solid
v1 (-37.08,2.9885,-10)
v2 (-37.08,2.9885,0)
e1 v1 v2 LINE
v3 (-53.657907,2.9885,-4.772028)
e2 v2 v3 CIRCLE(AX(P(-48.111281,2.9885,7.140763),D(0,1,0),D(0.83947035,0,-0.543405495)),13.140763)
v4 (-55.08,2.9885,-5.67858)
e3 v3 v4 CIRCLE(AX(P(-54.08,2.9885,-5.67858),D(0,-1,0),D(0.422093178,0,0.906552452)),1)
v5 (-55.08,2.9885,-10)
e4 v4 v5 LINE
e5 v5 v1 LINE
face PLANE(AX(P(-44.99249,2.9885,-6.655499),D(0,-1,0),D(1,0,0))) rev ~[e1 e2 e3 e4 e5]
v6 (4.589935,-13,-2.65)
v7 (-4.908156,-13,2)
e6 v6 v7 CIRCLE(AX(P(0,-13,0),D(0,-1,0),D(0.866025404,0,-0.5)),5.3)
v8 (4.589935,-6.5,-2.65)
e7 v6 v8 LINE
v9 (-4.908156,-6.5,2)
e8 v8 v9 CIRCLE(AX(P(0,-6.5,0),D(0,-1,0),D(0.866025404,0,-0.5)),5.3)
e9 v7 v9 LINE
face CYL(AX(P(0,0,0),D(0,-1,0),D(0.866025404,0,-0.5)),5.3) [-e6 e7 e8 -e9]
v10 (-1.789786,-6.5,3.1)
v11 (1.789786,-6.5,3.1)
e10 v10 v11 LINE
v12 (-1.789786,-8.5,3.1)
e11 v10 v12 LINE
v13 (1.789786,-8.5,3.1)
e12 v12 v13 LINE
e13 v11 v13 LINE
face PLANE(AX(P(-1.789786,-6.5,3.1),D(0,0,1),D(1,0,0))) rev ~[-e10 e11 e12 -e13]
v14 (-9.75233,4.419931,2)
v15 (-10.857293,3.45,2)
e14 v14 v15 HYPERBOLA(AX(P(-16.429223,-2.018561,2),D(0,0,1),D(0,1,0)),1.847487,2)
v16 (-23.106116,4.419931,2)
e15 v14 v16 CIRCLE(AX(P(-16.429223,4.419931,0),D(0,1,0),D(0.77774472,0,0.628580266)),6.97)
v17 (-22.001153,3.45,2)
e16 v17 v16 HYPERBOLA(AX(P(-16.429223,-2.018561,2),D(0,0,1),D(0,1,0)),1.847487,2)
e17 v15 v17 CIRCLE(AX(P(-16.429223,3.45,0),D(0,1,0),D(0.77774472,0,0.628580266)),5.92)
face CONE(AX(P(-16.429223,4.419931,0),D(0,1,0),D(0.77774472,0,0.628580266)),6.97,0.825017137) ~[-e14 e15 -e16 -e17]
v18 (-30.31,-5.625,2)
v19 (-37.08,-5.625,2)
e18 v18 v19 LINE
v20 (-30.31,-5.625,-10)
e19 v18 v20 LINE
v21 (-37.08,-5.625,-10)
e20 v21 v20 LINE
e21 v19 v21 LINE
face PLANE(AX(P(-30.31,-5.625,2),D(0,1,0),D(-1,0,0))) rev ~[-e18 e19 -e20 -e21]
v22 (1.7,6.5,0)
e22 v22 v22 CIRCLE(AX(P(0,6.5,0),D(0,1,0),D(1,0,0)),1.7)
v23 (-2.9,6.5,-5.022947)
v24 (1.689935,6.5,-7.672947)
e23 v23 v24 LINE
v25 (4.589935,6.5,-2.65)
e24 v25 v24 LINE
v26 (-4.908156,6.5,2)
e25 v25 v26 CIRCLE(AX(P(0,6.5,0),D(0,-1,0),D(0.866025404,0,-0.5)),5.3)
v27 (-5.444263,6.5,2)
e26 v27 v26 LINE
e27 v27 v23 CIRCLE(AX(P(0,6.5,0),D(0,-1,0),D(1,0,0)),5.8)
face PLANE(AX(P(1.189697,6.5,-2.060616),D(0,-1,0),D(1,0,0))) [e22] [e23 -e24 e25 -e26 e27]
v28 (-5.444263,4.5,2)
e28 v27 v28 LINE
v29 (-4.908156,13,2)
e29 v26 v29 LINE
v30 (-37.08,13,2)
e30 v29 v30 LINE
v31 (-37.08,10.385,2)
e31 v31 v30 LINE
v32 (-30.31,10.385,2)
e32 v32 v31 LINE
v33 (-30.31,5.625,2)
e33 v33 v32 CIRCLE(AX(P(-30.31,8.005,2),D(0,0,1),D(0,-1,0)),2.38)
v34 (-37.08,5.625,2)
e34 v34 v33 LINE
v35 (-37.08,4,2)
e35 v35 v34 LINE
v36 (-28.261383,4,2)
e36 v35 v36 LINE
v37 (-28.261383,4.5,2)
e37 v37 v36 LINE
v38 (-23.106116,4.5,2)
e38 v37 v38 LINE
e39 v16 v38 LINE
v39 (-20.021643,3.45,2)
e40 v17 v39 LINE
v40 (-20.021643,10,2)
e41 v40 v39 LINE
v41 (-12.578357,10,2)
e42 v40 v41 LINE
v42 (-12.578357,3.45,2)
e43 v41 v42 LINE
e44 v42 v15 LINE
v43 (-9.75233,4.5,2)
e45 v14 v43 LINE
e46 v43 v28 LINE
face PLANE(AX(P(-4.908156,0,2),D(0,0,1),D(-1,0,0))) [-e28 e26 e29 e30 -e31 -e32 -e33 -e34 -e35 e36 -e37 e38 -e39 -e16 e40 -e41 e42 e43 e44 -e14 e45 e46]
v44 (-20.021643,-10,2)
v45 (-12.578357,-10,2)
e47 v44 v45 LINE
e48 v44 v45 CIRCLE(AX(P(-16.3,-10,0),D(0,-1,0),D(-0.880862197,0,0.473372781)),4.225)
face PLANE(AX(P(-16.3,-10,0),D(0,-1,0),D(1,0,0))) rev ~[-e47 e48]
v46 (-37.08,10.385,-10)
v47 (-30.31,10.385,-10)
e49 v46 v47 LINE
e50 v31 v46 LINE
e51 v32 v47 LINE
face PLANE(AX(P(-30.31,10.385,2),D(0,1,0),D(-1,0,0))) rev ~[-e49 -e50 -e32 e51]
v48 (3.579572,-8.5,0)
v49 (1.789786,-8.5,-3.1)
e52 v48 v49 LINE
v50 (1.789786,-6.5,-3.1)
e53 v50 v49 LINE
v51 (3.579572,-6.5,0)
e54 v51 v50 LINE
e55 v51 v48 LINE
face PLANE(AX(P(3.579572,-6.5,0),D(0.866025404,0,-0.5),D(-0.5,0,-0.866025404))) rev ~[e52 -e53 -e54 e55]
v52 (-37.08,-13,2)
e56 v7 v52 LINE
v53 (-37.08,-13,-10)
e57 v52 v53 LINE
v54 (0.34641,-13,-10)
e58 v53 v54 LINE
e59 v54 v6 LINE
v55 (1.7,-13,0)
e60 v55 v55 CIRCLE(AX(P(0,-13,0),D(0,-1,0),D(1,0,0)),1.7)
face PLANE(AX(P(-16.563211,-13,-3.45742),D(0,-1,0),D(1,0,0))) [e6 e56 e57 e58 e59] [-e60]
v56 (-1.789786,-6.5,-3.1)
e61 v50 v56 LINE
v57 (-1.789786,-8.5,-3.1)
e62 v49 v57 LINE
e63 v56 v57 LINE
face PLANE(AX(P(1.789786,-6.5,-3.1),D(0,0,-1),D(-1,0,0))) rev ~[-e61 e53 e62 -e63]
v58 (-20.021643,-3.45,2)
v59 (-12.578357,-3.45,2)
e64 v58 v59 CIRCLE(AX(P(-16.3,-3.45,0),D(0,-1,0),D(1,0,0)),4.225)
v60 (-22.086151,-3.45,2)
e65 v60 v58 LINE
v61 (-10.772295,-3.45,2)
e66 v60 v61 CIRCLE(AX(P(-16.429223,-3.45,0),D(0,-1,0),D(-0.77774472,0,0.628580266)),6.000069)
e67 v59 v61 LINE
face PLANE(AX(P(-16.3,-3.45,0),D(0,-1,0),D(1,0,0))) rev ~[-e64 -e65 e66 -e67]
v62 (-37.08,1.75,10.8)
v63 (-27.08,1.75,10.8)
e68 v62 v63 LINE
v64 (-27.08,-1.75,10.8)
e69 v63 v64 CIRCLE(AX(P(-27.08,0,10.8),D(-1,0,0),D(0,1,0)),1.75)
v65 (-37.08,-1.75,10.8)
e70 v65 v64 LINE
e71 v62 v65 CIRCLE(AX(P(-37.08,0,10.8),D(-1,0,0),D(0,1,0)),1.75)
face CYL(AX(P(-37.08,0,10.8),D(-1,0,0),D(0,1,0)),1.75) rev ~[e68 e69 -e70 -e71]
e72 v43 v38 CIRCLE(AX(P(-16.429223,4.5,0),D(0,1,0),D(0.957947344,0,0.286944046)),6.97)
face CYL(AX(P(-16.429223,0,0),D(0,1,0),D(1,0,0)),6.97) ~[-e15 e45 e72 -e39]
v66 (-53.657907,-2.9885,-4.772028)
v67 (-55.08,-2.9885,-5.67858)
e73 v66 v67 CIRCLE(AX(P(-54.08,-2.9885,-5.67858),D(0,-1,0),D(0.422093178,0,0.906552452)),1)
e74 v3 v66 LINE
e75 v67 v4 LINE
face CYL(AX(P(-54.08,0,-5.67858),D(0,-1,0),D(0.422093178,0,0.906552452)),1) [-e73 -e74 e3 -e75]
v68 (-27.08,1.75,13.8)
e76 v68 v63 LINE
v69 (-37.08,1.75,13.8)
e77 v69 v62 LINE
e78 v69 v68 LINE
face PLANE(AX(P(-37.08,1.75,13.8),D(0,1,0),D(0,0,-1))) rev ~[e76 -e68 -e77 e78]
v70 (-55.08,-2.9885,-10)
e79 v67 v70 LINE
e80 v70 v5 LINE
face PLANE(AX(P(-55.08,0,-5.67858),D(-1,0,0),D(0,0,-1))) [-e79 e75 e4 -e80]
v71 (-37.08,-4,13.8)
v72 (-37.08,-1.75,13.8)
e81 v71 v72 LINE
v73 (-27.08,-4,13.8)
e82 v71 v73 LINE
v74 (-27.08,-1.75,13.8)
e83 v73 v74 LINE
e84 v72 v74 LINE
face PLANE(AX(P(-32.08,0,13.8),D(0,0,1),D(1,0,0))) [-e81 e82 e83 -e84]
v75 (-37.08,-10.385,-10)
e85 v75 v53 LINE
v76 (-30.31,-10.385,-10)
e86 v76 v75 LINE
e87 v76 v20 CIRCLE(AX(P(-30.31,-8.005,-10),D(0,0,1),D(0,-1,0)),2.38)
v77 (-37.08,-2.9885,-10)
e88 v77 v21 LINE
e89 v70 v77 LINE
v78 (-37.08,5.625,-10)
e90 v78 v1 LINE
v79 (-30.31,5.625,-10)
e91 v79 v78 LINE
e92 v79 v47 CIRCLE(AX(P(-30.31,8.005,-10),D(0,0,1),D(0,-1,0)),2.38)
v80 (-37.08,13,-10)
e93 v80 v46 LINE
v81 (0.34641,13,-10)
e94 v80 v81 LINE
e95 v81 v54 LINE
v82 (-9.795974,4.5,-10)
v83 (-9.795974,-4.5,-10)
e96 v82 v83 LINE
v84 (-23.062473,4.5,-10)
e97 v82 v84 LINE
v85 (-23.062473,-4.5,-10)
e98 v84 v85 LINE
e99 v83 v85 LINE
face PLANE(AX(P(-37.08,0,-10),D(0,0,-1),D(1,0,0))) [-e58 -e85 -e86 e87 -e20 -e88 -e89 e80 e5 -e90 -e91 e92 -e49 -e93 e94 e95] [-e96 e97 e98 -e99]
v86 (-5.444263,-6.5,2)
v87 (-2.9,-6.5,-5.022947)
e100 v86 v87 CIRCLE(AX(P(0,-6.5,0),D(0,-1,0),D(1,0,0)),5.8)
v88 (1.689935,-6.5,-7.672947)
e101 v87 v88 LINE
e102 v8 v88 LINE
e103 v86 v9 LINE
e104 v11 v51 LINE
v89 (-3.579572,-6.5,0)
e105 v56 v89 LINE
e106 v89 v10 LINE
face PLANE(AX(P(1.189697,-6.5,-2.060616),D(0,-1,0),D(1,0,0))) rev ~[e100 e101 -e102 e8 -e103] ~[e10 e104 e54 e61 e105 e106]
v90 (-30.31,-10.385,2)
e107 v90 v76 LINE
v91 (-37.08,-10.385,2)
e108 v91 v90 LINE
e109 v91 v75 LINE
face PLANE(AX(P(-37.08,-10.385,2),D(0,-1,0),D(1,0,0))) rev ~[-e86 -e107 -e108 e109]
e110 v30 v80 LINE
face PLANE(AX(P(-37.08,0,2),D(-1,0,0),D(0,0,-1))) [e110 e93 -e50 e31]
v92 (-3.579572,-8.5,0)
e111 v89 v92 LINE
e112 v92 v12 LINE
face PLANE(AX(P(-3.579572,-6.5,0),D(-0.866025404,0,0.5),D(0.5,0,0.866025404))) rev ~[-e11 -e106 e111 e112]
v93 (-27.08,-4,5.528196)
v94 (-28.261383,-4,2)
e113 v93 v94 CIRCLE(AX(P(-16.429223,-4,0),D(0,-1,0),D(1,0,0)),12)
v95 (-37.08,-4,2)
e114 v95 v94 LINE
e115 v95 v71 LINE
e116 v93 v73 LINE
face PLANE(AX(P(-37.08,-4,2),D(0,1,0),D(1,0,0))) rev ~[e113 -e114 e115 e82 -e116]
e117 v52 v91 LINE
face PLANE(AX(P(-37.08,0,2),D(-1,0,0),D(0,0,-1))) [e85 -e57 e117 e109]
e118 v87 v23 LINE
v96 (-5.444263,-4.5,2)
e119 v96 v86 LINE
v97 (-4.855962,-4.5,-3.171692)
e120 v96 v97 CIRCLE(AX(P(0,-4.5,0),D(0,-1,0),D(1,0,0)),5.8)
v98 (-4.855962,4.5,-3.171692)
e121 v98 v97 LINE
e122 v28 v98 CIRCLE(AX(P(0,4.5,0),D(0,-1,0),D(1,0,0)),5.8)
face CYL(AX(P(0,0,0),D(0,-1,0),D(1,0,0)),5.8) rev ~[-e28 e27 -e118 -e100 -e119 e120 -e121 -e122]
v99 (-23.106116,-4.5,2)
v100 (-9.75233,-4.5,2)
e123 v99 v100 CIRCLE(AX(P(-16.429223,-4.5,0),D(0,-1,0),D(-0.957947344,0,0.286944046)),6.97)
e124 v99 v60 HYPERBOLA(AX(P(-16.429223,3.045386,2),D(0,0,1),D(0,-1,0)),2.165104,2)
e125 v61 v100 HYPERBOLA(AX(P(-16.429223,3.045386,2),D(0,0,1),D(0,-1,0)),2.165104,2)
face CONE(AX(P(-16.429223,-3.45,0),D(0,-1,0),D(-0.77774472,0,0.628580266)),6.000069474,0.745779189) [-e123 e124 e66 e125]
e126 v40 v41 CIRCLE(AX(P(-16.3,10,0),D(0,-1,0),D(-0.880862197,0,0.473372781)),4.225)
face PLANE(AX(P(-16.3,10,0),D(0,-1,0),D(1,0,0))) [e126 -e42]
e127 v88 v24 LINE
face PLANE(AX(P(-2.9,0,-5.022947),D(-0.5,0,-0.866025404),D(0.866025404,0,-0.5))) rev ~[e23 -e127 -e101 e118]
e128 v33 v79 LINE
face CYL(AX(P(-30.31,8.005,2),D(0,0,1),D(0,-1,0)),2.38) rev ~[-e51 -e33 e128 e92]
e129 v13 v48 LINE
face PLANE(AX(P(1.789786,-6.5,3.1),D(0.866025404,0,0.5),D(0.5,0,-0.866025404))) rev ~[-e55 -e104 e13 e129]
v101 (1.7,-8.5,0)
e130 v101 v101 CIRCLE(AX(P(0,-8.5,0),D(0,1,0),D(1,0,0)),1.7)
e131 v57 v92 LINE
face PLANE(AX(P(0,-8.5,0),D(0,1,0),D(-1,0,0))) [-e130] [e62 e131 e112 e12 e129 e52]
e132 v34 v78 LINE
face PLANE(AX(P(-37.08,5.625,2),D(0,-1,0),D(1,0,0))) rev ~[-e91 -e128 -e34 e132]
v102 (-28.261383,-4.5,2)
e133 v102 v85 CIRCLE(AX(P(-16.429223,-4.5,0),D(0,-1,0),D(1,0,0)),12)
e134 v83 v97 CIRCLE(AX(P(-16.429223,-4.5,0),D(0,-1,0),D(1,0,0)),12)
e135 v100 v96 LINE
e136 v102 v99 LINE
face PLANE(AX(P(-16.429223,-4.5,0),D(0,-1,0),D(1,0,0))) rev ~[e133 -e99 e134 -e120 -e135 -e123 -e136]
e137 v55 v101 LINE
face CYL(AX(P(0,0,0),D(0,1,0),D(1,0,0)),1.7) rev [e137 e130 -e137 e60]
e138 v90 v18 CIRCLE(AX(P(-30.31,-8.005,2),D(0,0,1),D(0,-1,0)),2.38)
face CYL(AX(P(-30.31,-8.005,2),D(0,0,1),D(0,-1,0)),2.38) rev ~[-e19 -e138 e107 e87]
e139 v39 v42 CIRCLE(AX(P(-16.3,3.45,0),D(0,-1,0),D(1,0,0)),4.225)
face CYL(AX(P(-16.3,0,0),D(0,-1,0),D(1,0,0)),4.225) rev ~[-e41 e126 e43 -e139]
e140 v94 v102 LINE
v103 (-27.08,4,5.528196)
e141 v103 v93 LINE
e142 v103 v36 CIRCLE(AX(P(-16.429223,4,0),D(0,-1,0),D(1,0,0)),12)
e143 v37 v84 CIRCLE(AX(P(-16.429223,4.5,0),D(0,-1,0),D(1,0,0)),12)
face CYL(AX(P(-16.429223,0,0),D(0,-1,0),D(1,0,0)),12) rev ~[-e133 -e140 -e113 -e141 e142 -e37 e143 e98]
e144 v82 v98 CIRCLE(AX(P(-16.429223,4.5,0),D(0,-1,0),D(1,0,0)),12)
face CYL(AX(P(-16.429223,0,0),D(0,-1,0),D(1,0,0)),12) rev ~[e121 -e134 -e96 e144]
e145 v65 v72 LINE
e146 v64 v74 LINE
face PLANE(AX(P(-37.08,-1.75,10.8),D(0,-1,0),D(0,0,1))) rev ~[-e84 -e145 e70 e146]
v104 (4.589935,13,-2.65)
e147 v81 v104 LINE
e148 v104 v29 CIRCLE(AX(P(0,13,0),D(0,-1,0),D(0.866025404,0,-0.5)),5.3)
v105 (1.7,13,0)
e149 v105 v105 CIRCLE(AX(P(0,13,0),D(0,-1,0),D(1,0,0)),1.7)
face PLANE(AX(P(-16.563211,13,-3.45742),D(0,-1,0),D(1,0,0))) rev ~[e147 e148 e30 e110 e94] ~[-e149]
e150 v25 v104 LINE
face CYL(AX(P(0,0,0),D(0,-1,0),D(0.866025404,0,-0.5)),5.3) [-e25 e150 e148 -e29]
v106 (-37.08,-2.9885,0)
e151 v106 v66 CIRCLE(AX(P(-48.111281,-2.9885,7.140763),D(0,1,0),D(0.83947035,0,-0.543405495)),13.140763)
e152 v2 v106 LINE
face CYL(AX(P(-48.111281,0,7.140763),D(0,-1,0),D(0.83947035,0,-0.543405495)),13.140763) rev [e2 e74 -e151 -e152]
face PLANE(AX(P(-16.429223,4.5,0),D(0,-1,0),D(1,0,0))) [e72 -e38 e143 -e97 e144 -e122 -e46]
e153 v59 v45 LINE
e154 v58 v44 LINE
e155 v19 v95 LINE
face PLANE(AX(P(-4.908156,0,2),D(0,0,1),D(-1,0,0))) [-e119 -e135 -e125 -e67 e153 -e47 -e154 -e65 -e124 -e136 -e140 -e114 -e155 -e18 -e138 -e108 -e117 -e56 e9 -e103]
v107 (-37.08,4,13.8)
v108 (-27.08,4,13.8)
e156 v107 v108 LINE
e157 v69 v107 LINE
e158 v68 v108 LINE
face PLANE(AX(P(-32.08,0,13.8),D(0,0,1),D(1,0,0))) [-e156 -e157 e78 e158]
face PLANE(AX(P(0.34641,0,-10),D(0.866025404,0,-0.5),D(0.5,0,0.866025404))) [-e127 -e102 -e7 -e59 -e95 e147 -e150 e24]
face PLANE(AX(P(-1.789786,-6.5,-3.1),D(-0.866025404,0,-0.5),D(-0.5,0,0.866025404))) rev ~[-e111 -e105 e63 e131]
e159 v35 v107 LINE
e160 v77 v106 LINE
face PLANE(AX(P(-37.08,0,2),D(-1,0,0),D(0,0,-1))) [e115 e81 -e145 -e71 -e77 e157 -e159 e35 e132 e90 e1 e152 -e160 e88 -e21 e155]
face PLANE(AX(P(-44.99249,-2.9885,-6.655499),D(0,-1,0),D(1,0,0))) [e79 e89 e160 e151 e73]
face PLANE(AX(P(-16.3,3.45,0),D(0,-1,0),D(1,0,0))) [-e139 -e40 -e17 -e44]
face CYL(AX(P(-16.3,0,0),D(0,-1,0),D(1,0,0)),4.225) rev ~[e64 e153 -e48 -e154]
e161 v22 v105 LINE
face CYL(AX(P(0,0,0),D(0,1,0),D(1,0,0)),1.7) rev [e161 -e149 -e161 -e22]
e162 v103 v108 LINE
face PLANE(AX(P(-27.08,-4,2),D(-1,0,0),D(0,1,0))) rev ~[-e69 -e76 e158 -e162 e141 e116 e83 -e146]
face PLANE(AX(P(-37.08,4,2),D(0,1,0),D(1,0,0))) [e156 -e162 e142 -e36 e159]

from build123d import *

# Parameters (mm, degrees)
F0_R         = 1.7
F1_DEPTH     = 13
F3_DEPTH     = 12.001
F5_DEPTH     = 6.5
F6_W         = 10
F6_H         = 8
F7_DEPTH     = 11.8
F9_DEPTH     = 42.381
F10_R        = 4.225
F11_DEPTH    = 10
F12_R        = 7.5
F13_DEPTH    = 3.45
F16_R        = 12
F16_R_2      = 6.97
F17_DEPTH    = 4.5
F18_T4_ANGLE = 257.8909092885
F18_T7_ANGLE = 257.8909092885
F20_DEPTH    = 2.9885
F22_DEPTH    = 2


# Not quite as in the source:
# - a fillet or chamfer that OpenCascade refuses, or shapes differently, is made with other operations: its cross-section is extruded or revolved along the edge and cut away or added


with BuildPart() as f1:
    # F0 (on Front) → F1 (new body, symmetric)
    with BuildSketch(Plane.XZ):
        with BuildLine():
            Line((-37.08, 2), (-37.08, -10))
            Line((-37.08, -10), (0.3464101615, -10))
            Line((0.3464101615, -10), (4.5899346401, -2.65))
            ThreePointArc((4.5899346401, -2.65), (2.3304380027, 4.760153224), (-4.9081564767, 2))
            Line((-4.9081564767, 2), (-37.08, 2))
        make_face()
        Circle(F0_R, mode=Mode.SUBTRACT)
    extrude(amount=F1_DEPTH, both=True)

    # F2 (on face) → F3 (cut, through all)
    with BuildSketch(Plane.XY.offset(2)):
        with BuildLine():
            Line((-30.31, 10.385), (-37.08, 10.385))
            Line((-37.08, 10.385), (-37.08, 5.625))
            Line((-37.08, 5.625), (-30.31, 5.625))
            ThreePointArc((-30.31, 5.625), (-27.93, 8.005), (-30.31, 10.385))
        make_face()
        with BuildLine():
            ThreePointArc((-30.31, -10.385), (-27.93, -8.005), (-30.31, -5.625))
            Line((-30.31, -5.625), (-37.08, -5.625))
            Line((-37.08, -5.625), (-37.08, -10.385))
            Line((-37.08, -10.385), (-30.31, -10.385))
        make_face()
    extrude(amount=-F3_DEPTH, mode=Mode.SUBTRACT)

    # F4 (on Front) → F5 (cut, symmetric)
    with BuildSketch(Plane.XZ):
        with BuildLine():
            Line((5.8, -10.0458946839), (5.8, 0))
            ThreePointArc((5.8, 0), (-2.9, 5.0229473419), (-2.9, -5.0229473419))
            Line((-2.9, -5.0229473419), (5.8, -10.0458946839))
        make_face()
    extrude(amount=F5_DEPTH, both=True, mode=Mode.SUBTRACT)

    # F6 (on face) → F7 (join)
    with BuildSketch(Plane.XY.offset(2)):
        with Locations((-32.08, 0)):
            Rectangle(F6_W, F6_H)
    extrude(amount=F7_DEPTH)

    # F8 (on face) → F9 (cut, through all)
    with BuildSketch(Plane(origin=(-37.08, 0, 0), x_dir=(0, -1, 0), z_dir=(-1, 0, 0))):
        with BuildLine():
            Line((1.75, 13.8), (-1.75, 13.8))
            Line((-1.75, 13.8), (-1.75, 10.8))
            ThreePointArc((-1.75, 10.8), (0, 9.05), (1.75, 10.8))
            Line((1.75, 10.8), (1.75, 13.8))
        make_face()
    extrude(amount=-F9_DEPTH, mode=Mode.SUBTRACT)

    # F10 (on Front) → F11 (cut, symmetric)
    with BuildSketch(Plane.XZ):
        with Locations((-16.3, 0)):
            Circle(F10_R)
    extrude(amount=F11_DEPTH, both=True, mode=Mode.SUBTRACT)

    # F12 (on Front) → F13 (cut, symmetric)
    with BuildSketch(Plane.XZ):
        with Locations((-16.3, 0)):
            Circle(F12_R)
    extrude(amount=F13_DEPTH, both=True, mode=Mode.SUBTRACT)

    # F16 (on Front) → F17 (cut, symmetric)
    with BuildSketch(Plane.XZ):
        with Locations((-16.4292231202, 0)):
            Circle(F16_R)
        with Locations((-16.4292231202, 0)):
            Circle(F16_R_2, mode=Mode.SUBTRACT)
    extrude(amount=F17_DEPTH, both=True, mode=Mode.SUBTRACT)

    # F18: chamfer of 1.05 x 0.9699305265 on 2 edges, made by hand


with BuildPart() as f18_tool2:
    # F18_s3 → F18_t4 (revolve)
    with BuildSketch(Plane(origin=(-6.4914021144, 0, -8.0318361717), x_dir=(0, 1, 0), z_dir=(0.6285802661, 0, 0.7777447197))):
        Polygon((-3.45, 18.7778110045), (-4.5, 19.747741531), (-3.45, 19.747741531), align=None)
    revolve(axis=Axis((-16.4292231202, -3.45, 0), (0, -1, 0)), revolution_arc=F18_T4_ANGLE)

    split(bisect_by=Plane.XZ.offset(4.5), keep=Keep.BOTTOM)


with BuildPart() as f1_1:
    add(f1.part)

    # F18_t1: cut F18_tool2
    add(f18_tool2.part, mode=Mode.SUBTRACT)

    # F18_s6 → F18_t7 (revolve, cut)
    with BuildSketch(Plane(origin=(-6.4914021144, 0, 8.0318361717), x_dir=(0, 1, 0), z_dir=(-0.6285802661, 0, 0.7777447197))):
        Polygon((4.4199305265, 5.807741531), (3.45, 6.857741531), (3.45, 5.807741531), align=None)
    revolve(axis=Axis((-16.4292231202, 3.45, 0), (0, 1, 0)), revolution_arc=F18_T7_ANGLE, mode=Mode.SUBTRACT)

    # F19 (on Front) → F20 (join, symmetric)
    with BuildSketch(Plane.XZ):
        with BuildLine():
            Line((-37.08, -10), (-37.08, 0))
            ThreePointArc((-37.08, 0), (-44.4762536163, -5.4872309342), (-53.6579068221, -4.7720279633))
            ThreePointArc((-53.6579068221, -4.7720279633), (-54.617543869, -4.8353446309), (-55.08, -5.6785804158))
            Line((-55.08, -5.6785804158), (-55.08, -10))
            Line((-55.08, -10), (-37.08, -10))
        make_face()
    extrude(amount=F20_DEPTH, both=True)

    # F21 (on face) → F22 (cut)
    with BuildSketch(Plane(origin=(0, -6.5, 0), x_dir=(-1, 0, 0), z_dir=(0, 1, 0))):
        Polygon((-3.579571669, 0), (-1.7897858345, -3.1), (1.7897858345, -3.1), (3.579571669, 0), (1.7897858345, 3.1), (-1.7897858345, 3.1), align=None)
    extrude(amount=-F22_DEPTH, mode=Mode.SUBTRACT)


solid = f1_1.part
